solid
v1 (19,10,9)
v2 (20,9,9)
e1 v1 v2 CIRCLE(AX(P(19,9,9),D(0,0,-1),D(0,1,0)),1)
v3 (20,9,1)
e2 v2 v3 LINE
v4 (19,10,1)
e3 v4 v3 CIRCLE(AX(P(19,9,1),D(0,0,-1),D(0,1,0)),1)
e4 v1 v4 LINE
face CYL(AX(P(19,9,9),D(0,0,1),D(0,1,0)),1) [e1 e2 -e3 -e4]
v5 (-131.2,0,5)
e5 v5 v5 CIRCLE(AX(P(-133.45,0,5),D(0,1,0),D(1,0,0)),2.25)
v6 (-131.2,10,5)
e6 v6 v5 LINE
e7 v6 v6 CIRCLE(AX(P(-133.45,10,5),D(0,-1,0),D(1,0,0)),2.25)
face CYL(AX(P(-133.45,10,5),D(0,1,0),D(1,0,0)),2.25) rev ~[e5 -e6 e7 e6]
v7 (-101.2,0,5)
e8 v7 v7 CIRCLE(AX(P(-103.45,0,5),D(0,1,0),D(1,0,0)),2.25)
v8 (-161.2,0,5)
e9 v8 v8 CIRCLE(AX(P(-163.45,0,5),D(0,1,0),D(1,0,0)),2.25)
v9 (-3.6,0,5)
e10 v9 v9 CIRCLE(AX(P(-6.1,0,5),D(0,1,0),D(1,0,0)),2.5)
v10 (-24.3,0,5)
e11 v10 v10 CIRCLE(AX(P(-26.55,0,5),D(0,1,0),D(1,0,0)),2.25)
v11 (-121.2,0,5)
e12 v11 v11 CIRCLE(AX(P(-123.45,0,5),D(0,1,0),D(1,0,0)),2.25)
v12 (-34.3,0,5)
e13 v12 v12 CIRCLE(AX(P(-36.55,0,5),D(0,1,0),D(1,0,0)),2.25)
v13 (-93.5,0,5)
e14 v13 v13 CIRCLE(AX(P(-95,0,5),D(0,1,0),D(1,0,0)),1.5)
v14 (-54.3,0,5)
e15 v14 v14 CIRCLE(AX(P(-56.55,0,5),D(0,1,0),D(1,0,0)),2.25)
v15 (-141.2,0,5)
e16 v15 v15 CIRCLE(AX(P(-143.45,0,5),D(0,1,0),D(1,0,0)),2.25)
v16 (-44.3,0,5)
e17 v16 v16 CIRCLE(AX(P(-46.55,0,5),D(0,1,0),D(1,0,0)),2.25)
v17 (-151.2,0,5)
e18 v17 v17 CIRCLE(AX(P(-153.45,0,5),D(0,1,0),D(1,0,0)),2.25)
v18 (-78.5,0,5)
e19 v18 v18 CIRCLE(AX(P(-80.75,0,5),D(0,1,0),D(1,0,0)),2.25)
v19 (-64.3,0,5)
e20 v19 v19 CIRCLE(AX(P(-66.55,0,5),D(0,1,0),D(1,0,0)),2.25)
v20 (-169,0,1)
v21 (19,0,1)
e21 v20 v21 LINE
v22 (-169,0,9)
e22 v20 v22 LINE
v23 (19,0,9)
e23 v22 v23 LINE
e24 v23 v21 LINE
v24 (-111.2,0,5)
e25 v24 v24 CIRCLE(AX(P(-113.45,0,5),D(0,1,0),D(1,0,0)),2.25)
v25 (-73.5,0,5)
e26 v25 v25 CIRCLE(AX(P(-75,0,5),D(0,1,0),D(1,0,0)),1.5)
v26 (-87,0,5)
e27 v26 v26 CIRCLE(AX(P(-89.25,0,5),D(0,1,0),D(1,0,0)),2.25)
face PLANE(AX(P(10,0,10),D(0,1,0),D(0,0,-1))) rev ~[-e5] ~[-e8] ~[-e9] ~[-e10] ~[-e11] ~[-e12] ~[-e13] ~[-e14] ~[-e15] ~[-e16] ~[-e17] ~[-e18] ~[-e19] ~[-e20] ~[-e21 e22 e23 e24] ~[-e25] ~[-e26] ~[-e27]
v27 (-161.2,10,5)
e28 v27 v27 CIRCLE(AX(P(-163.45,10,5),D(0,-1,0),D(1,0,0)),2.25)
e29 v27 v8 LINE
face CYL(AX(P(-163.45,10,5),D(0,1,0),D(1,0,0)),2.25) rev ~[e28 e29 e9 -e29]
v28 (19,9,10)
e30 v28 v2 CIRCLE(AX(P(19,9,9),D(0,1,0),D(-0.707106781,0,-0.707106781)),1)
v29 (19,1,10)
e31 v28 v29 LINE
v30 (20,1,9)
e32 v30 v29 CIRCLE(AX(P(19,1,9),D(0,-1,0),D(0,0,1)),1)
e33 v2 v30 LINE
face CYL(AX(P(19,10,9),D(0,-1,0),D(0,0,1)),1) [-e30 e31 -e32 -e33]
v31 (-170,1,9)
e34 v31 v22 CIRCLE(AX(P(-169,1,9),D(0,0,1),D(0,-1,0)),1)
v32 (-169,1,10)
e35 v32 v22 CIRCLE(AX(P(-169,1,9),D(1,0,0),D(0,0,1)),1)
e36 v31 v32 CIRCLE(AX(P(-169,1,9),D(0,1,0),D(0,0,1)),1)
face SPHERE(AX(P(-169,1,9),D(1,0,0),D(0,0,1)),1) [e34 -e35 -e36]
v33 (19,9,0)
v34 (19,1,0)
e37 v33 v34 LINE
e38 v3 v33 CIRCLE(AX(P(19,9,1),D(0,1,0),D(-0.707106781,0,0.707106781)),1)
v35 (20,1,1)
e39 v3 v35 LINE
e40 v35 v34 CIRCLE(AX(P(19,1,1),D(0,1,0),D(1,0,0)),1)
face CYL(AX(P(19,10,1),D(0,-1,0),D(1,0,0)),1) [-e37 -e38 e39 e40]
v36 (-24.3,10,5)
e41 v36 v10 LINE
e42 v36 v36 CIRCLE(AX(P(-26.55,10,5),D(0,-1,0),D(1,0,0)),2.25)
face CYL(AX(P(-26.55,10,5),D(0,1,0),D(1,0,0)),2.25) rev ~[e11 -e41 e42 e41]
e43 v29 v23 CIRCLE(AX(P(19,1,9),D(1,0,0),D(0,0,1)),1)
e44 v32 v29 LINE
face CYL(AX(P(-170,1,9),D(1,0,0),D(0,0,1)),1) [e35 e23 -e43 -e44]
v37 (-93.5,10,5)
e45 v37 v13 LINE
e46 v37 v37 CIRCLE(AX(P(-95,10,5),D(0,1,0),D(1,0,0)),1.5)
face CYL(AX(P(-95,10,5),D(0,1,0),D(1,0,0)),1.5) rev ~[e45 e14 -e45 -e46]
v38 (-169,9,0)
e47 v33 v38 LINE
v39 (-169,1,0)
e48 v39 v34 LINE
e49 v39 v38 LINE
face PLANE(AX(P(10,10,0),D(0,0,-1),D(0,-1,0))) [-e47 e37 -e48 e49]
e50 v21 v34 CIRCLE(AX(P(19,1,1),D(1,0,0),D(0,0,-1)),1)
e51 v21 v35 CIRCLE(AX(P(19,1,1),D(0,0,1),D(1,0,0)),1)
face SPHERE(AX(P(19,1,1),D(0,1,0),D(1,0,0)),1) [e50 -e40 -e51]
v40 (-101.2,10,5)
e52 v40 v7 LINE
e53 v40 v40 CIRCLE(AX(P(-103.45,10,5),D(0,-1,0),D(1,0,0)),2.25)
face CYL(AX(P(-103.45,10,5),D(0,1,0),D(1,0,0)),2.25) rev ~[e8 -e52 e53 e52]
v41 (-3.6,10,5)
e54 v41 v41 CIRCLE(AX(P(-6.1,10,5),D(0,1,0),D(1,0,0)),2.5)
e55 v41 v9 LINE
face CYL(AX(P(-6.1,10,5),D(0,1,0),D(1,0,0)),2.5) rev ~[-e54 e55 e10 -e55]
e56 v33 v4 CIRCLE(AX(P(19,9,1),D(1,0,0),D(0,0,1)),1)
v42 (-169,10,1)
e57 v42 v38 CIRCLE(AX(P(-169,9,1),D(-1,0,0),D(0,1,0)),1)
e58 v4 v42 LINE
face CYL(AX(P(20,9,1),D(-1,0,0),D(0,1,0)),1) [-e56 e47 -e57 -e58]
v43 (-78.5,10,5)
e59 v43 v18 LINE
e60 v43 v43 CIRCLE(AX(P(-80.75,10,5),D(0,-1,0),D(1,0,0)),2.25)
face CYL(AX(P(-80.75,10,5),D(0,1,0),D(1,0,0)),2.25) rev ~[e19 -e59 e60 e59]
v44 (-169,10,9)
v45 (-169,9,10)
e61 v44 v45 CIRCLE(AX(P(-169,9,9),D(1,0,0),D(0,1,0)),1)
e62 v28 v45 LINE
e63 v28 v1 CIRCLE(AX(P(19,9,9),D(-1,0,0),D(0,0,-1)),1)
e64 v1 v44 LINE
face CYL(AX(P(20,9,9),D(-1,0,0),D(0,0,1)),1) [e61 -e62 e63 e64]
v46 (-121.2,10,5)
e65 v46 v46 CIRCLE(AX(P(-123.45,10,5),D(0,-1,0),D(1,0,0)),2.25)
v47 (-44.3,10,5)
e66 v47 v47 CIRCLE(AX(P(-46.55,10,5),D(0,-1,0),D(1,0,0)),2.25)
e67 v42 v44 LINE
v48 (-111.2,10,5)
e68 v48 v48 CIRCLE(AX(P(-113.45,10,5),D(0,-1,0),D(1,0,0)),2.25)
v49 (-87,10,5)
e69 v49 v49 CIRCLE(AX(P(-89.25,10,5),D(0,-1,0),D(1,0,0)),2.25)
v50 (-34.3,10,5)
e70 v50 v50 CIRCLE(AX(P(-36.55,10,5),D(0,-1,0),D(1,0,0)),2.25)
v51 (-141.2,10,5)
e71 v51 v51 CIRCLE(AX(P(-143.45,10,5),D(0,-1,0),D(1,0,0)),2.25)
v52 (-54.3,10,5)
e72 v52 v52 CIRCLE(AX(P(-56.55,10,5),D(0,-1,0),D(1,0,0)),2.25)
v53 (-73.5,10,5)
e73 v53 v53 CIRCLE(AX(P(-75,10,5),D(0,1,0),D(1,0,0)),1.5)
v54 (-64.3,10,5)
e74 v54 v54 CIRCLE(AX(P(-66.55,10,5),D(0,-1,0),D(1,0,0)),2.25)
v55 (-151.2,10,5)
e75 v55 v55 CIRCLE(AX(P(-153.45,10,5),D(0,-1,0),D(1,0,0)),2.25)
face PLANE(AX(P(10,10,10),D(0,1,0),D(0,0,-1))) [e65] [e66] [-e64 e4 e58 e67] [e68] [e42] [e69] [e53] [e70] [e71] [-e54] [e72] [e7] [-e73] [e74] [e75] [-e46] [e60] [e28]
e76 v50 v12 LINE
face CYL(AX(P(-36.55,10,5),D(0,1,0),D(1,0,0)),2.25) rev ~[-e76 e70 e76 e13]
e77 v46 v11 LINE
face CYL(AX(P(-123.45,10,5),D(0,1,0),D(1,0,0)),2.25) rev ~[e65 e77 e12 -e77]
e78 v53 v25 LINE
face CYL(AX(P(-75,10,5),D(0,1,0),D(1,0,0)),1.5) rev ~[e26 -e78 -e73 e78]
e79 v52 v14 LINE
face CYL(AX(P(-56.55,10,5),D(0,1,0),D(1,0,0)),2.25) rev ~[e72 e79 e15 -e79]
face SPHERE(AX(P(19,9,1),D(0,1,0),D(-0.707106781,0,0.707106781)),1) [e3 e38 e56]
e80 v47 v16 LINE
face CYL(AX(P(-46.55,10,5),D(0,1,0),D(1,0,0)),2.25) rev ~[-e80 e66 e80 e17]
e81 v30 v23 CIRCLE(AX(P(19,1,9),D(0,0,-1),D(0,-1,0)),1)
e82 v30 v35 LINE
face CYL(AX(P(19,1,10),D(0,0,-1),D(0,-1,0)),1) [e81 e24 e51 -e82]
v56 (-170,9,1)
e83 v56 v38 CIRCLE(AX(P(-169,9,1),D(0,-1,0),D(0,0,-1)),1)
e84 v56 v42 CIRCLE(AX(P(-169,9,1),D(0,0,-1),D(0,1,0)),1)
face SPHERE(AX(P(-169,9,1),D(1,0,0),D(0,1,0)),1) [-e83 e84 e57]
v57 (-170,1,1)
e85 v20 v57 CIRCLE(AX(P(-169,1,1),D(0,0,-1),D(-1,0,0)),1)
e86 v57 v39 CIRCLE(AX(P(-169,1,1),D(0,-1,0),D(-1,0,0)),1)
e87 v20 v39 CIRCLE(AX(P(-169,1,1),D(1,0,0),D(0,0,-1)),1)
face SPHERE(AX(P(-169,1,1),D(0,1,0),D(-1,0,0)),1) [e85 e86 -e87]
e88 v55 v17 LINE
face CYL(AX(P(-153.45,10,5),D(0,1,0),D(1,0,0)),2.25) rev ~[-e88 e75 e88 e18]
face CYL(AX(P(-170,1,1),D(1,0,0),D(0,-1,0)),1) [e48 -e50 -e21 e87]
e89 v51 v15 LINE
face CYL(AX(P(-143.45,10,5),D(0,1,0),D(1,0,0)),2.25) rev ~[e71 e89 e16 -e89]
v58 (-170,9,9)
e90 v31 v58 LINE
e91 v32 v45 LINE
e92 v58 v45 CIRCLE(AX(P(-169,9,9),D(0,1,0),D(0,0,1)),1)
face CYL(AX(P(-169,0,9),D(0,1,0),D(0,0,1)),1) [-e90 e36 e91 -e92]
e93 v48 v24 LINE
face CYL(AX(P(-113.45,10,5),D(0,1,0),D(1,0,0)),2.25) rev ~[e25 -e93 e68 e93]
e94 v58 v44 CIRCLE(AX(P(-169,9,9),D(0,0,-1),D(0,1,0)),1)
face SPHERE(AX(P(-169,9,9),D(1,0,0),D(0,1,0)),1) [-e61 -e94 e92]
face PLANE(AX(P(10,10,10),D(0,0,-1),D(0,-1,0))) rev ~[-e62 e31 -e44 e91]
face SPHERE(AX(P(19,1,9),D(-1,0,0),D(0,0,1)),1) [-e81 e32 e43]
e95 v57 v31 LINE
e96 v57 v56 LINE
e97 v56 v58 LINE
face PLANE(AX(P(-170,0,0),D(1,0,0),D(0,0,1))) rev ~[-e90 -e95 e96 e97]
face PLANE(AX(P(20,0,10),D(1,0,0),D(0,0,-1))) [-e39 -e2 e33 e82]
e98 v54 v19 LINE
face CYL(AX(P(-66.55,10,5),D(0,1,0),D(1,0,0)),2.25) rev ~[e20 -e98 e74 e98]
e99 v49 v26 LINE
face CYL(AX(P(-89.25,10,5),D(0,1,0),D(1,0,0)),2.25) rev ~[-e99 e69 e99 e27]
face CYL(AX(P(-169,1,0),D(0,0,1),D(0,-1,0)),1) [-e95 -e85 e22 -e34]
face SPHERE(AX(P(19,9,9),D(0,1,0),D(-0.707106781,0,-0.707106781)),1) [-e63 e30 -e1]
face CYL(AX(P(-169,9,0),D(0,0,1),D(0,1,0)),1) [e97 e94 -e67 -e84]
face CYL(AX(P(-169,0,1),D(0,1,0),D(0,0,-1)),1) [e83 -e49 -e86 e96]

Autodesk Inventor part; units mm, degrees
ref_plane "YZ Plane" through (0, 0, 0) normal (1, 0, 0) x (0, 1, 0)
ref_plane "XZ Plane" through (0, 0, 0) normal (0, 1, 0) x (-1, 0, 0)
ref_plane "XY Plane" through (0, 0, 0) normal (0, 0, 1) x (1, 0, 0)
sketch "Sketch1" plane through (0, 0, 0) normal (0, 1, 0) x (-1, 0, 0)
  line L0 (0, 0) -> (170, 0)
  line L1 (170, 0) -> (170, 10)
  line L2 (170, 10) -> (0, 10)
  line L3 (0, 10) -> (0, 0)
  dimension "d0" = 170
  dimension "d1" = 10
extrude "Extrusion1" add sketch "Sketch1" along normal blind 10
sketch "Sketch2" plane through (0, 10, 0) normal (0, 1, 0) x (1, 0, 0)
  line L0 (0, -10) -> (0, 0) projected
  line L1 (0, -5) -> (-2.2, -5)
  circle A0 centre (-6.1, -5) radius 3.9
  line L2 (0, 0) -> (-170, 0) projected
  line L3 (-170, -10) -> (0, -10) projected
  circle A1 centre (-75, -5) radius 1.5
  circle A2 centre (-95, -5) radius 1.5
  dimension "d4" = 2.2
  dimension "d8" = 3
  dimension "d9" = 3
extrude "Extrusion2" cut sketch "Sketch2" against normal blind 10 contours A1
extrude "Extrusion3" cut sketch "Sketch2" against normal blind 10 contours A2
extrude "Extrusion4" cut sketch "Sketch2" against normal blind 10 contours A0
sketch "Sketch3" plane through (0, 10, 0) normal (0, 1, 0) x (1, 0, 0)
  line L0 (-170, 0) -> (-170, -10) projected
  line L1 (-170, -5) -> (-10, -5)
  circle A0 centre (-6.1, -5) radius 3.9 projected
  line L2 (-165.7, -5) -> (-163.45, -5)
  circle A1 centre (-163.45, -5) radius 2.25
  circle A2 centre (-153.45, -5) radius 2.25
  circle A3 centre (-143.45, -5) radius 2.25
  circle A4 centre (-133.45, -5) radius 2.25
  circle A5 centre (-123.45, -5) radius 2.25
  circle A6 centre (-113.45, -5) radius 2.25
  circle A7 centre (-103.45, -5) radius 2.25
  circle A8 centre (-95, -5) radius 1.5 projected
  line L3 (-93.5, -5) -> (-93.5, -7.9104)
  circle A9 centre (-75, -5) radius 1.5 projected
  line L4 (-76.5, -5) -> (-76.5, -7.25)
  line L5 (-93.5, -5) -> (-76.5, -5)
  line L6 (-85, -5) -> (-93.5, -5)
  line L7 (-85, -5) -> (-76.5, -5)
  circle A10 centre (-80.75, -5) radius 2.25
  circle A11 centre (-89.25, -5) radius 2.25
  line L8 (-10, -5) -> (-12, -5)
  line L9 (-10, -5) -> (-14.3, -5)
  line L10 (-14.3, -5) -> (-16.55, -5)
  circle A12 centre (-16.55, -5) radius 2.25
  circle A13 centre (-26.55, -5) radius 2.25
  circle A14 centre (-36.55, -5) radius 2.25
  circle A15 centre (-46.55, -5) radius 2.25
  circle A16 centre (-56.55, -5) radius 2.25
  circle A17 centre (-66.55, -5) radius 2.25
  point P0 (0, 0)
  point P1 (-155.7, -5)
  point P2 (-145.7, -5)
  point P3 (-135.7, -5)
  point P4 (-125.7, -5)
  point P5 (-115.7, -5)
  point P6 (-105.7, -5)
  point P7 (-24.3, -5)
  point P8 (-34.3, -5)
  point P9 (-44.3, -5)
  point P10 (-54.3, -5)
  point P11 (-64.3, -5)
  dimension "d20" = 10
  dimension "d32" = 10
extrude "Extrusion5" cut sketch "Sketch3" against normal blind 10 contours A1 L1 | L1 A1 | L1 A12 | L1 A12 | A2 L1 | L1 A2 | A3 L1 | L1 A3 | A4 L1 | L1 A4 | A5 L1 | L1 A5 | A6 L1 | L1 A6 | A7 L1 | L1 A7 | A11 L1 | L1 A11 | A10 L1 | L1 A10 | A17 L1 | L1 A17 | A16 L1 | L1 A16 | A15 L1 | L1 A15 | A14 L1 | L1 A14 | A13 L1 | L1 A13
thread "Thread1" size "M3x0.5" class "6H" standard "ANSI Metric M Profile" full length
thread "Thread2" size "M3x0.5" class "6H" standard "ANSI Metric M Profile" full length
sketch "Sketch4" plane through (0, 10, 0) normal (0, 1, 0) x (1, 0, 0)
  circle A0 centre (-16.55, -5) radius 2.25 projected
  circle A1 centre (-16.55, -5) radius 2.25
  point P0 (0, 0)
extrude "Extrusion6" add sketch "Sketch4" against normal blind 10
sketch "Sketch5" plane through (0, 0, 10) normal (1, 0, 0) x (0, 0, -1)
  line L0 (10, 0) -> (0, 0) projected
  line L1 (0, 0) -> (0, 10) projected
  line L2 (10, 0) -> (0, 0)
  line L3 (0, 0) -> (0, 10)
  line L4 (0, 10) -> (10, 10)
  line L5 (10, 10) -> (10, 0)
extrude "Extrusion7" add sketch "Sketch5" along normal blind 10
sketch "Sketch6" plane through (10, 0, 10) normal (1, 0, 0) x (0, 0, -1)
  line L0 (0, 0) -> (10, 0) projected
  line L1 (0, 10) -> (0, 0) projected
  line L2 (10, 0) -> (0, 0)
  line L3 (0, 0) -> (0, 10)
  line L4 (0, 10) -> (10, 10)
  line L5 (10, 10) -> (10, 0)
extrude "Extrusion8" add sketch "Sketch6" along normal blind 10
sketch "Sketch7" plane through (0, 10, 0) normal (0, 1, 0) x (1, 0, 0)
  point P0 (0, 0)
fillet "Fillet3" radius 1 11 edges at (-75, 10, 10) (-75, 0, 10) (-75, 10, 0) (20, 5, 10) (20, 5, 0) (20, 0, 5) (-170, 10, 5) (-170, 5, 10) (-170, 5, 0) (-170, 0, 5) (-75, 0, 0)
fillet "Fillet4" radius 1 3 edges at (19.7071, 9.7071, 9.7071) (19.7071, 9.7071, 0.2929) (20, 10, 5)
sketch "Sketch8" plane through (19, 1, 0) normal (0, 0, -1) x (-1, 0, 0)
  point P0 (19, -1)
sketch "Sketch9" plane through (0, 10, 0) normal (0, 1, 0) x (1, 0, 0)
  circle A0 centre (-6.1, -5) radius 3.9 projected
  circle A1 centre (-6.1, -5) radius 2.5
  point P0 (0, 0)
  dimension "d53" = 5
extrude "Extrusion9" add sketch "Sketch9" against normal blind 10
properties part number "brazo apoyo"
